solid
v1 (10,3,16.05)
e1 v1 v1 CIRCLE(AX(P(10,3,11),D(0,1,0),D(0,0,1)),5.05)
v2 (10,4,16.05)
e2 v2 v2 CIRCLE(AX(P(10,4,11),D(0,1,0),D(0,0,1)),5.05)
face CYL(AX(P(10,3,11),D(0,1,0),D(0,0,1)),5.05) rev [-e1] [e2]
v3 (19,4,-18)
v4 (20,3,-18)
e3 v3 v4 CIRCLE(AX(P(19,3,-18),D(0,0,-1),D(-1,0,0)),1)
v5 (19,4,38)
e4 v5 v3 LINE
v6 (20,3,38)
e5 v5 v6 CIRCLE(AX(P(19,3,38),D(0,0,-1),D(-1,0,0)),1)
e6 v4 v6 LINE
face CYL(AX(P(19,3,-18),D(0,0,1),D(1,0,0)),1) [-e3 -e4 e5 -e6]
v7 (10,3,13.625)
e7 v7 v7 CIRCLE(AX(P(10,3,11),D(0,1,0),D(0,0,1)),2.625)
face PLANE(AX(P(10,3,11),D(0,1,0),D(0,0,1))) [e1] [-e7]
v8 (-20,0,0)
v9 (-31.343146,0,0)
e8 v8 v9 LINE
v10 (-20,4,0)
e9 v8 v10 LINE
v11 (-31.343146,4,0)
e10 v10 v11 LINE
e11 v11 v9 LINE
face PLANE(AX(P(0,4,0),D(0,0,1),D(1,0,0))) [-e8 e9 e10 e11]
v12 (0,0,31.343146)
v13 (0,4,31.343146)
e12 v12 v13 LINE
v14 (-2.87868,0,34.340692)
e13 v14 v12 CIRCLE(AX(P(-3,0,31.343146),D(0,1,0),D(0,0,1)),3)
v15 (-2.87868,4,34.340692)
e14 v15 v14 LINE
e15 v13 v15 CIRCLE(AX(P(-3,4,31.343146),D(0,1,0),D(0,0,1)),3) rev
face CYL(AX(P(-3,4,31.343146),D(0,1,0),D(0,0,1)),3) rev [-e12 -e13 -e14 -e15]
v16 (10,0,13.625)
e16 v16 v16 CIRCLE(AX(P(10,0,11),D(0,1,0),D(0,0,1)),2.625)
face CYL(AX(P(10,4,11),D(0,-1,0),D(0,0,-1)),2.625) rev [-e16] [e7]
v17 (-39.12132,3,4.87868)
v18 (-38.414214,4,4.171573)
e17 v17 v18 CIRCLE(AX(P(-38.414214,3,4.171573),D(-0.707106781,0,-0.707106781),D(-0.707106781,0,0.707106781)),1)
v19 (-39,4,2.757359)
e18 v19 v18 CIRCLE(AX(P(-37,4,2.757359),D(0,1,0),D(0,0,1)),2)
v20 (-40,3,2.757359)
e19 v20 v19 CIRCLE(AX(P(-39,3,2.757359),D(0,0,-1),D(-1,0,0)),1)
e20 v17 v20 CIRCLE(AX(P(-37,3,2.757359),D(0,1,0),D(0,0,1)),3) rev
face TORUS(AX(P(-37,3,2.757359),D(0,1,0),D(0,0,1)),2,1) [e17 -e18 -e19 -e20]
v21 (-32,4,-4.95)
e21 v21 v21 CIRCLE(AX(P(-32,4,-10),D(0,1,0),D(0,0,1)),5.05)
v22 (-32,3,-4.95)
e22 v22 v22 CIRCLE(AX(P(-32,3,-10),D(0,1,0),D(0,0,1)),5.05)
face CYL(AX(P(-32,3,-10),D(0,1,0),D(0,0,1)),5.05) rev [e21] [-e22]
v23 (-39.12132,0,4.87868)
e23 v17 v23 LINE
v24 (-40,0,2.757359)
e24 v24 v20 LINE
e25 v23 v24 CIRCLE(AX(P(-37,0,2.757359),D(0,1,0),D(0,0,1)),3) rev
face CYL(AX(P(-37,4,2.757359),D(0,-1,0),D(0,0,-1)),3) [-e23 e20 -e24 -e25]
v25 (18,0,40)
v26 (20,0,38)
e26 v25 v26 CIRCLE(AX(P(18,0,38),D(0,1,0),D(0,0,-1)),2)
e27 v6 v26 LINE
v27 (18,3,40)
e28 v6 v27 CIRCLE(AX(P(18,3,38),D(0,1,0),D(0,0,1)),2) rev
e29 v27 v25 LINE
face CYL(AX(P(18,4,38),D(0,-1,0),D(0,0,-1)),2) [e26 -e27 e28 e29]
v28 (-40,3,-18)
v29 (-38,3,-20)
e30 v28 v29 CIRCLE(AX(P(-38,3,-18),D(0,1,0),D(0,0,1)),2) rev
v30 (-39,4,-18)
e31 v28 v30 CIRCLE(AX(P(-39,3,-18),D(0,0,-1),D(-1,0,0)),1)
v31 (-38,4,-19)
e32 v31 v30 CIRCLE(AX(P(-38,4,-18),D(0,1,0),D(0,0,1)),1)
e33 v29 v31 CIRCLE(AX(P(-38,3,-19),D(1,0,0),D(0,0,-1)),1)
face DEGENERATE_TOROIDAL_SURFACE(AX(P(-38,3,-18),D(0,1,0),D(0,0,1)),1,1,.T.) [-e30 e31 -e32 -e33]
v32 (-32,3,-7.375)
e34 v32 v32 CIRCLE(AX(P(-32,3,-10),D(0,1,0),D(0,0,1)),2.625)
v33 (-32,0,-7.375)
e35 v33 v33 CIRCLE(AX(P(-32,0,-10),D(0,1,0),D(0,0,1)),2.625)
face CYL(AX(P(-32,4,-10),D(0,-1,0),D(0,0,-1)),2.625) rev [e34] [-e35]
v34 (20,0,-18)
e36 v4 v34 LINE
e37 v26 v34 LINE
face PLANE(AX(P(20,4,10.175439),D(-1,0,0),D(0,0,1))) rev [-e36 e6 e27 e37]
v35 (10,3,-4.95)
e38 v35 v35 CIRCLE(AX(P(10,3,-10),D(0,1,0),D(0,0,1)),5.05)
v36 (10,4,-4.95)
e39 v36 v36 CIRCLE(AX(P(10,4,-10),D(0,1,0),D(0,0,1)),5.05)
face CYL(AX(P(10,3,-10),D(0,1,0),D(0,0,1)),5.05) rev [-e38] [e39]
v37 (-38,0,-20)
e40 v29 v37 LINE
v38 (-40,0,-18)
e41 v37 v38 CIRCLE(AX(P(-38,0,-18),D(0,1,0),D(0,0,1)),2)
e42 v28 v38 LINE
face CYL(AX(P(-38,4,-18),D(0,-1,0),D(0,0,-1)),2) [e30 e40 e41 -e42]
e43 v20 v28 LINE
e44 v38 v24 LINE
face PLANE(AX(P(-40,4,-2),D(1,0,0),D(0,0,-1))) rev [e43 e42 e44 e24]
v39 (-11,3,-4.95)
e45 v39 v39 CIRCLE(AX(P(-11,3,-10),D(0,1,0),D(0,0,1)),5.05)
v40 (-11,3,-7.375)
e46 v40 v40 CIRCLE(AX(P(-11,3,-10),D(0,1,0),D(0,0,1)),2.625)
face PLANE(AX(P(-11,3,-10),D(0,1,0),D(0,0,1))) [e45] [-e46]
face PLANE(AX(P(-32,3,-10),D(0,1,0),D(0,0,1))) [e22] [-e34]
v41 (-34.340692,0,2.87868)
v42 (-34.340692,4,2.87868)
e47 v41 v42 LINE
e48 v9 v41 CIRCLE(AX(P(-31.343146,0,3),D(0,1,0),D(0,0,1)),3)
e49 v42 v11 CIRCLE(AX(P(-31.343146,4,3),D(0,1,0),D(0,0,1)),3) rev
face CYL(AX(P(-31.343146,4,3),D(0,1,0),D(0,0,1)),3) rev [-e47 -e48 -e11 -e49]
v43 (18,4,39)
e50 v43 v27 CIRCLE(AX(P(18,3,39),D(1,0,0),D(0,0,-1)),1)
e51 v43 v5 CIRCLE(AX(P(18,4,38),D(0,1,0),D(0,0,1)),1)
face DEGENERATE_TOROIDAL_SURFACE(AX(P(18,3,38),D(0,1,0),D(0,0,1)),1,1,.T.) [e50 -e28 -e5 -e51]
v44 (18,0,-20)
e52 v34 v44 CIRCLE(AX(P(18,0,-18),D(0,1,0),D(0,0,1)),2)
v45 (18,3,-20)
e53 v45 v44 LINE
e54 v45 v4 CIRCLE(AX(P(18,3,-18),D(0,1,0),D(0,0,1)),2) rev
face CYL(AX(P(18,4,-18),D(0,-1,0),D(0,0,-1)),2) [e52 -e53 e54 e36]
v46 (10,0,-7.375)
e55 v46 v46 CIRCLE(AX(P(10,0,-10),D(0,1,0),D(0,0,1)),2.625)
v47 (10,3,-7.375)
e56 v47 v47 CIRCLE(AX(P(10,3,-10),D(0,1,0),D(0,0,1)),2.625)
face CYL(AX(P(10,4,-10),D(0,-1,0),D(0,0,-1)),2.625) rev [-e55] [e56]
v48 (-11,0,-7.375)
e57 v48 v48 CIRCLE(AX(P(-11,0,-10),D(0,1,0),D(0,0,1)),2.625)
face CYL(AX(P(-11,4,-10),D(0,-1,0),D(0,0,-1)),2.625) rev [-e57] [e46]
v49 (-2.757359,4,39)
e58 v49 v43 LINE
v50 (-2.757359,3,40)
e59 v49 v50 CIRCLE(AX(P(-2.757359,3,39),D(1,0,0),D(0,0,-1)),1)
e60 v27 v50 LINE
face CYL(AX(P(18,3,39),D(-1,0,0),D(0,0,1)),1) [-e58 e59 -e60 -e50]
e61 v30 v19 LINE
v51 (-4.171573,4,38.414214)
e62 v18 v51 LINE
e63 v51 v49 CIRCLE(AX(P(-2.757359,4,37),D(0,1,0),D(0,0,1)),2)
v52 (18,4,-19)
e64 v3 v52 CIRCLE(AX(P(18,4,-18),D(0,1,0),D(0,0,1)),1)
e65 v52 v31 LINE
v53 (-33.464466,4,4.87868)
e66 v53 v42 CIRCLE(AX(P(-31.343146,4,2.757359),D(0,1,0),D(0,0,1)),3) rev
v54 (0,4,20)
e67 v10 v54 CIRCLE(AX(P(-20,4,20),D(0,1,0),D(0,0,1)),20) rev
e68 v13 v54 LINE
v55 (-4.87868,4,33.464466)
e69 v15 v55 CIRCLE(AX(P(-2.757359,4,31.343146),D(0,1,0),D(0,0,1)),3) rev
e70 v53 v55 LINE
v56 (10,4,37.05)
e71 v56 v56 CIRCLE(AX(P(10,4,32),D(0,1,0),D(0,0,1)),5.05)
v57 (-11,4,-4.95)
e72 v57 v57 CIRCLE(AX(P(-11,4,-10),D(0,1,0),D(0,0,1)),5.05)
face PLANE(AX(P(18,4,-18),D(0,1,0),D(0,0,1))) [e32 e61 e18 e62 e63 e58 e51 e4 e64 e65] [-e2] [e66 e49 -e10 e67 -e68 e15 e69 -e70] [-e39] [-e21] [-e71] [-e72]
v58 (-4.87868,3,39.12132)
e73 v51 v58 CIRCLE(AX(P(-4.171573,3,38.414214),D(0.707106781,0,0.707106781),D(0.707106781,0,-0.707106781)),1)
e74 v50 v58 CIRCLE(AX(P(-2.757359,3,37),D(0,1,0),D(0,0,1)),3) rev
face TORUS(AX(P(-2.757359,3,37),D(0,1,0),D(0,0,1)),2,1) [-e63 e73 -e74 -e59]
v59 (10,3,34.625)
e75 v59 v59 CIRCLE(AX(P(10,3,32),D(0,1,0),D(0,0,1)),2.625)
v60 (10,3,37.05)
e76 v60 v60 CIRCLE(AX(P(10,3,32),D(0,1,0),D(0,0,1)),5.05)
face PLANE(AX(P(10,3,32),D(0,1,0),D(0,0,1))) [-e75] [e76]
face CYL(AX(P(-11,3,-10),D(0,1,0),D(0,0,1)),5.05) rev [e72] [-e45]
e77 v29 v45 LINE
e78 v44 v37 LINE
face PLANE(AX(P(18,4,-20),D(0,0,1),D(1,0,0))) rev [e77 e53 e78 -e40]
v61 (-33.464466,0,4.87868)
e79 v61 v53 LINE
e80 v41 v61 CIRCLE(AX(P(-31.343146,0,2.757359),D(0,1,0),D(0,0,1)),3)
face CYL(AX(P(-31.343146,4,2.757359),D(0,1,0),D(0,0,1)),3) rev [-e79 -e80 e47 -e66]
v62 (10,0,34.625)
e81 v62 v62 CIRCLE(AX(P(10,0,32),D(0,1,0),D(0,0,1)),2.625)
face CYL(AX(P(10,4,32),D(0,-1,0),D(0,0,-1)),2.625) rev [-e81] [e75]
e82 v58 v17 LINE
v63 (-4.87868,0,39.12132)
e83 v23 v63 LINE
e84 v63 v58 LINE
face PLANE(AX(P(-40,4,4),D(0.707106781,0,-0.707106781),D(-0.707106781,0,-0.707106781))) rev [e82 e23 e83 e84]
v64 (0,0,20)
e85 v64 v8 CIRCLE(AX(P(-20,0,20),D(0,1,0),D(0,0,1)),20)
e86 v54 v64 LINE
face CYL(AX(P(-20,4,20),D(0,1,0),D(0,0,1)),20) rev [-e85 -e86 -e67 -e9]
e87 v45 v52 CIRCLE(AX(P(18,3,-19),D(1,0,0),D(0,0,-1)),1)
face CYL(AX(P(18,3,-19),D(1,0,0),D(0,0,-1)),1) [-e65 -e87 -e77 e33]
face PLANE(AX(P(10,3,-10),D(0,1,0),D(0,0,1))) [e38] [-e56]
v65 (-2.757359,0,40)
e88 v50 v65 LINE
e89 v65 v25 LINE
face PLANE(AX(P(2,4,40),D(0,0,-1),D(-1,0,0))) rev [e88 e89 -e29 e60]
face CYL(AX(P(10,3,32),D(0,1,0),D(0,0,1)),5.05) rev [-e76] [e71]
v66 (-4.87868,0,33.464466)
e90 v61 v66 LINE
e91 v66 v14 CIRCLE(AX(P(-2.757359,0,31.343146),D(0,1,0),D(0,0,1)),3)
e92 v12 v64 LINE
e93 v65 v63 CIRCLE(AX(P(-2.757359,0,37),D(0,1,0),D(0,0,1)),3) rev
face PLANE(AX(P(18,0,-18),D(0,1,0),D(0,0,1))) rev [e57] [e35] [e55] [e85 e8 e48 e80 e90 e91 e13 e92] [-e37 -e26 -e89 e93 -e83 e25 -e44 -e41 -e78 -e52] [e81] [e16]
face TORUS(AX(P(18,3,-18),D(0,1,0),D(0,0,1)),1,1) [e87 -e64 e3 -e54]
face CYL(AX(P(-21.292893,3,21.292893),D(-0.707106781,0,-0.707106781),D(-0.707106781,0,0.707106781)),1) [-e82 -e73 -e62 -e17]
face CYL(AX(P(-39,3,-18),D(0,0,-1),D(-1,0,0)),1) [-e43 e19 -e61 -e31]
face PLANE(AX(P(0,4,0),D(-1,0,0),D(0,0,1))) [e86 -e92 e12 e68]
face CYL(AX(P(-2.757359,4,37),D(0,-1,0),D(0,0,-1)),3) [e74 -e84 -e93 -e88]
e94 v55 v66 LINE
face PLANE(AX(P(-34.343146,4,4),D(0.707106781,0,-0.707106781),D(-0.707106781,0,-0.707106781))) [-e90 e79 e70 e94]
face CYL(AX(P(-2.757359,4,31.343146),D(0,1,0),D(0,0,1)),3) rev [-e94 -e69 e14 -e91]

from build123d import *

# Parameters (mm, degrees)
SKETCH1_R           = 2.625
BOSS_EXTRUDE1_DEPTH = 4
FILLET1_R           = 20
FILLET2_R           = 3
SKETCH2_R           = 5.05
CUT_EXTRUDE1_DEPTH  = 1
FILLET3_R           = 1


with BuildPart() as part:
    # Sketch1 → Boss-Extrude1 (new body)
    with BuildSketch(Plane(origin=(0, 0, 0), x_dir=(1, 0, 0), z_dir=(0, 1, 0))):
        with BuildLine():
            Line((2, -40), (18, -40))
            ThreePointArc((18, -40), (19.414213562, -39.414213562), (20, -38))
            Line((20, -38), (20, -10.175438596))
            Line((20, -10.175438596), (20, 18))
            ThreePointArc((20, 18), (19.414213562, 19.414213562), (18, 20))
            Line((18, 20), (-38, 20))
            ThreePointArc((-38, 20), (-39.414213562, 19.414213562), (-40, 18))
            Line((-40, 18), (-40, 2))
            Line((-40, 2), (-40, -4))
            Line((-40, -4), (-4, -40))
            Line((-4, -40), (2, -40))
        make_face()
        with Locations(Location((-32, 10, 0), (0, 0, 270))):
            Circle(SKETCH1_R, mode=Mode.SUBTRACT)
        with Locations(Location((-11, 10, 0), (0, 0, 270))):
            Circle(SKETCH1_R, mode=Mode.SUBTRACT)
        with Locations(Location((10, -32, 0), (0, 0, 270))):
            Circle(SKETCH1_R, mode=Mode.SUBTRACT)
        with Locations(Location((10, 10, 0), (0, 0, 270))):
            Circle(SKETCH1_R, mode=Mode.SUBTRACT)
        with Locations(Location((10, -11, 0), (0, 0, 270))):
            Circle(SKETCH1_R, mode=Mode.SUBTRACT)
        Polygon((0, 0), (0, -34.343145751), (-4, -34.343145751), (-34.343145751, -4), (-34.343145751, 0), align=None, mode=Mode.SUBTRACT)
    extrude(amount=BOSS_EXTRUDE1_DEPTH)

    # Fillet1
    fillet1_edges = [part.edges().sort_by_distance(p)[0] for p in [
        (0, 2, 0),
    ]]
    fillet(fillet1_edges, radius=FILLET1_R)

    # Fillet2
    # the kernel refuses this fillet: 3 mm, written as the material it adds along each edge
    with BuildSketch(Plane(origin=(-4, 0, 34.343145751), x_dir=(1, 0, 0), z_dir=(0, 1, 0)), Plane(origin=(-34.343145751, 0, 4), x_dir=(0.7071067811865454, 0, 0.7071067811865497), z_dir=(0, 1, 0))) as fillet2_piece_1:
        with BuildLine():
            CenterArc((FILLET2_R * 0.414213562373, FILLET2_R), FILLET2_R, 225, 45)
            Line((-FILLET2_R * 0.292893218813, FILLET2_R * 0.292893218813), (0, 0))
            Line((0, 0), (FILLET2_R * 0.414213562373, 0))
        make_face()
    extrude(amount=4)
    with BuildSketch(Plane(origin=(0, 0, 34.343145751), x_dir=(0, 0, -1), z_dir=(0, 1, 0))) as fillet2_piece_2:
        with BuildLine():
            CenterArc((FILLET2_R, FILLET2_R), FILLET2_R, 180, 90)
            Line((0, FILLET2_R), (0, 0))
            Line((0, 0), (FILLET2_R, 0))
        make_face()
    extrude(amount=4)
    with BuildSketch(Plane(origin=(-34.343145751, 0, 0), x_dir=(1, 0, 0), z_dir=(0, 1, 0))) as fillet2_piece_3:
        with BuildLine():
            CenterArc((FILLET2_R, -FILLET2_R), FILLET2_R, 90, 90)
            Line((0, -FILLET2_R), (0, 0))
            Line((0, 0), (FILLET2_R, 0))
        make_face()
    extrude(amount=4)
    # the kernel refuses this fillet: 3 mm, written as the material it takes off along each edge
    with BuildSketch(Plane(origin=(-40, -3.106601718, 4), x_dir=(0, 0, -1), z_dir=(0, 1, 0))) as fillet2_2_piece_1:
        with BuildLine():
            CenterArc((FILLET2_R * 0.414213562373, -FILLET2_R), FILLET2_R, 90, 45)
            Line((-FILLET2_R * 0.292893218813, -FILLET2_R * 0.292893218813), (0, 0))
            Line((0, 0), (FILLET2_R * 0.414213562373, 0))
        make_face()
    extrude(amount=10.213203436, mode=Mode.SUBTRACT)
    with BuildSketch(Plane(origin=(-4, -3.106601718, 40), x_dir=(1, 0, 0), z_dir=(0, 1, 0))) as fillet2_2_piece_2:
        with BuildLine():
            CenterArc((FILLET2_R * 0.414213562373, FILLET2_R), FILLET2_R, 225, 45)
            Line((-FILLET2_R * 0.292893218813, FILLET2_R * 0.292893218813), (0, 0))
            Line((0, 0), (FILLET2_R * 0.414213562373, 0))
        make_face()
    extrude(amount=10.213203436, mode=Mode.SUBTRACT)

    # Sketch2 → Cut-Extrude1 (cut)
    with BuildSketch(Plane(origin=(0, 4, 0), x_dir=(1, 0, 0), z_dir=(0, 1, 0))):
        with Locations(Location((-32, 10, 0), (0, 0, 270))):
            Circle(SKETCH2_R)
        with Locations(Location((-11, 10, 0), (0, 0, 270))):
            Circle(SKETCH2_R)
        with Locations(Location((10, 10, 0), (0, 0, 270))):
            Circle(SKETCH2_R)
        with Locations(Location((10, -11, 0), (0, 0, 270))):
            Circle(SKETCH2_R)
        with Locations(Location((10, -32, 0), (0, 0, 270))):
            Circle(SKETCH2_R)
    extrude(amount=-CUT_EXTRUDE1_DEPTH, mode=Mode.SUBTRACT)

    # Fillet3
    fillet3_edges = [part.edges().sort_by_distance(p)[0] for p in [
        (-10, 4, -20),
        (-39.414213562, 4, -19.414213562),
        (-40, 4, -7.621320344),
        (19.414213562, 4, 39.414213562),
        (20, 4, 10),
        (-22, 4, 22),
        (7.621320344, 4, 40),
        (-3.90540961, 4, 39.771638598),
        (-39.771638598, 4, 3.90540961),
        (19.414213562, 4, -19.414213562),
    ]]
    fillet(fillet3_edges, radius=FILLET3_R)


solid = part.part
